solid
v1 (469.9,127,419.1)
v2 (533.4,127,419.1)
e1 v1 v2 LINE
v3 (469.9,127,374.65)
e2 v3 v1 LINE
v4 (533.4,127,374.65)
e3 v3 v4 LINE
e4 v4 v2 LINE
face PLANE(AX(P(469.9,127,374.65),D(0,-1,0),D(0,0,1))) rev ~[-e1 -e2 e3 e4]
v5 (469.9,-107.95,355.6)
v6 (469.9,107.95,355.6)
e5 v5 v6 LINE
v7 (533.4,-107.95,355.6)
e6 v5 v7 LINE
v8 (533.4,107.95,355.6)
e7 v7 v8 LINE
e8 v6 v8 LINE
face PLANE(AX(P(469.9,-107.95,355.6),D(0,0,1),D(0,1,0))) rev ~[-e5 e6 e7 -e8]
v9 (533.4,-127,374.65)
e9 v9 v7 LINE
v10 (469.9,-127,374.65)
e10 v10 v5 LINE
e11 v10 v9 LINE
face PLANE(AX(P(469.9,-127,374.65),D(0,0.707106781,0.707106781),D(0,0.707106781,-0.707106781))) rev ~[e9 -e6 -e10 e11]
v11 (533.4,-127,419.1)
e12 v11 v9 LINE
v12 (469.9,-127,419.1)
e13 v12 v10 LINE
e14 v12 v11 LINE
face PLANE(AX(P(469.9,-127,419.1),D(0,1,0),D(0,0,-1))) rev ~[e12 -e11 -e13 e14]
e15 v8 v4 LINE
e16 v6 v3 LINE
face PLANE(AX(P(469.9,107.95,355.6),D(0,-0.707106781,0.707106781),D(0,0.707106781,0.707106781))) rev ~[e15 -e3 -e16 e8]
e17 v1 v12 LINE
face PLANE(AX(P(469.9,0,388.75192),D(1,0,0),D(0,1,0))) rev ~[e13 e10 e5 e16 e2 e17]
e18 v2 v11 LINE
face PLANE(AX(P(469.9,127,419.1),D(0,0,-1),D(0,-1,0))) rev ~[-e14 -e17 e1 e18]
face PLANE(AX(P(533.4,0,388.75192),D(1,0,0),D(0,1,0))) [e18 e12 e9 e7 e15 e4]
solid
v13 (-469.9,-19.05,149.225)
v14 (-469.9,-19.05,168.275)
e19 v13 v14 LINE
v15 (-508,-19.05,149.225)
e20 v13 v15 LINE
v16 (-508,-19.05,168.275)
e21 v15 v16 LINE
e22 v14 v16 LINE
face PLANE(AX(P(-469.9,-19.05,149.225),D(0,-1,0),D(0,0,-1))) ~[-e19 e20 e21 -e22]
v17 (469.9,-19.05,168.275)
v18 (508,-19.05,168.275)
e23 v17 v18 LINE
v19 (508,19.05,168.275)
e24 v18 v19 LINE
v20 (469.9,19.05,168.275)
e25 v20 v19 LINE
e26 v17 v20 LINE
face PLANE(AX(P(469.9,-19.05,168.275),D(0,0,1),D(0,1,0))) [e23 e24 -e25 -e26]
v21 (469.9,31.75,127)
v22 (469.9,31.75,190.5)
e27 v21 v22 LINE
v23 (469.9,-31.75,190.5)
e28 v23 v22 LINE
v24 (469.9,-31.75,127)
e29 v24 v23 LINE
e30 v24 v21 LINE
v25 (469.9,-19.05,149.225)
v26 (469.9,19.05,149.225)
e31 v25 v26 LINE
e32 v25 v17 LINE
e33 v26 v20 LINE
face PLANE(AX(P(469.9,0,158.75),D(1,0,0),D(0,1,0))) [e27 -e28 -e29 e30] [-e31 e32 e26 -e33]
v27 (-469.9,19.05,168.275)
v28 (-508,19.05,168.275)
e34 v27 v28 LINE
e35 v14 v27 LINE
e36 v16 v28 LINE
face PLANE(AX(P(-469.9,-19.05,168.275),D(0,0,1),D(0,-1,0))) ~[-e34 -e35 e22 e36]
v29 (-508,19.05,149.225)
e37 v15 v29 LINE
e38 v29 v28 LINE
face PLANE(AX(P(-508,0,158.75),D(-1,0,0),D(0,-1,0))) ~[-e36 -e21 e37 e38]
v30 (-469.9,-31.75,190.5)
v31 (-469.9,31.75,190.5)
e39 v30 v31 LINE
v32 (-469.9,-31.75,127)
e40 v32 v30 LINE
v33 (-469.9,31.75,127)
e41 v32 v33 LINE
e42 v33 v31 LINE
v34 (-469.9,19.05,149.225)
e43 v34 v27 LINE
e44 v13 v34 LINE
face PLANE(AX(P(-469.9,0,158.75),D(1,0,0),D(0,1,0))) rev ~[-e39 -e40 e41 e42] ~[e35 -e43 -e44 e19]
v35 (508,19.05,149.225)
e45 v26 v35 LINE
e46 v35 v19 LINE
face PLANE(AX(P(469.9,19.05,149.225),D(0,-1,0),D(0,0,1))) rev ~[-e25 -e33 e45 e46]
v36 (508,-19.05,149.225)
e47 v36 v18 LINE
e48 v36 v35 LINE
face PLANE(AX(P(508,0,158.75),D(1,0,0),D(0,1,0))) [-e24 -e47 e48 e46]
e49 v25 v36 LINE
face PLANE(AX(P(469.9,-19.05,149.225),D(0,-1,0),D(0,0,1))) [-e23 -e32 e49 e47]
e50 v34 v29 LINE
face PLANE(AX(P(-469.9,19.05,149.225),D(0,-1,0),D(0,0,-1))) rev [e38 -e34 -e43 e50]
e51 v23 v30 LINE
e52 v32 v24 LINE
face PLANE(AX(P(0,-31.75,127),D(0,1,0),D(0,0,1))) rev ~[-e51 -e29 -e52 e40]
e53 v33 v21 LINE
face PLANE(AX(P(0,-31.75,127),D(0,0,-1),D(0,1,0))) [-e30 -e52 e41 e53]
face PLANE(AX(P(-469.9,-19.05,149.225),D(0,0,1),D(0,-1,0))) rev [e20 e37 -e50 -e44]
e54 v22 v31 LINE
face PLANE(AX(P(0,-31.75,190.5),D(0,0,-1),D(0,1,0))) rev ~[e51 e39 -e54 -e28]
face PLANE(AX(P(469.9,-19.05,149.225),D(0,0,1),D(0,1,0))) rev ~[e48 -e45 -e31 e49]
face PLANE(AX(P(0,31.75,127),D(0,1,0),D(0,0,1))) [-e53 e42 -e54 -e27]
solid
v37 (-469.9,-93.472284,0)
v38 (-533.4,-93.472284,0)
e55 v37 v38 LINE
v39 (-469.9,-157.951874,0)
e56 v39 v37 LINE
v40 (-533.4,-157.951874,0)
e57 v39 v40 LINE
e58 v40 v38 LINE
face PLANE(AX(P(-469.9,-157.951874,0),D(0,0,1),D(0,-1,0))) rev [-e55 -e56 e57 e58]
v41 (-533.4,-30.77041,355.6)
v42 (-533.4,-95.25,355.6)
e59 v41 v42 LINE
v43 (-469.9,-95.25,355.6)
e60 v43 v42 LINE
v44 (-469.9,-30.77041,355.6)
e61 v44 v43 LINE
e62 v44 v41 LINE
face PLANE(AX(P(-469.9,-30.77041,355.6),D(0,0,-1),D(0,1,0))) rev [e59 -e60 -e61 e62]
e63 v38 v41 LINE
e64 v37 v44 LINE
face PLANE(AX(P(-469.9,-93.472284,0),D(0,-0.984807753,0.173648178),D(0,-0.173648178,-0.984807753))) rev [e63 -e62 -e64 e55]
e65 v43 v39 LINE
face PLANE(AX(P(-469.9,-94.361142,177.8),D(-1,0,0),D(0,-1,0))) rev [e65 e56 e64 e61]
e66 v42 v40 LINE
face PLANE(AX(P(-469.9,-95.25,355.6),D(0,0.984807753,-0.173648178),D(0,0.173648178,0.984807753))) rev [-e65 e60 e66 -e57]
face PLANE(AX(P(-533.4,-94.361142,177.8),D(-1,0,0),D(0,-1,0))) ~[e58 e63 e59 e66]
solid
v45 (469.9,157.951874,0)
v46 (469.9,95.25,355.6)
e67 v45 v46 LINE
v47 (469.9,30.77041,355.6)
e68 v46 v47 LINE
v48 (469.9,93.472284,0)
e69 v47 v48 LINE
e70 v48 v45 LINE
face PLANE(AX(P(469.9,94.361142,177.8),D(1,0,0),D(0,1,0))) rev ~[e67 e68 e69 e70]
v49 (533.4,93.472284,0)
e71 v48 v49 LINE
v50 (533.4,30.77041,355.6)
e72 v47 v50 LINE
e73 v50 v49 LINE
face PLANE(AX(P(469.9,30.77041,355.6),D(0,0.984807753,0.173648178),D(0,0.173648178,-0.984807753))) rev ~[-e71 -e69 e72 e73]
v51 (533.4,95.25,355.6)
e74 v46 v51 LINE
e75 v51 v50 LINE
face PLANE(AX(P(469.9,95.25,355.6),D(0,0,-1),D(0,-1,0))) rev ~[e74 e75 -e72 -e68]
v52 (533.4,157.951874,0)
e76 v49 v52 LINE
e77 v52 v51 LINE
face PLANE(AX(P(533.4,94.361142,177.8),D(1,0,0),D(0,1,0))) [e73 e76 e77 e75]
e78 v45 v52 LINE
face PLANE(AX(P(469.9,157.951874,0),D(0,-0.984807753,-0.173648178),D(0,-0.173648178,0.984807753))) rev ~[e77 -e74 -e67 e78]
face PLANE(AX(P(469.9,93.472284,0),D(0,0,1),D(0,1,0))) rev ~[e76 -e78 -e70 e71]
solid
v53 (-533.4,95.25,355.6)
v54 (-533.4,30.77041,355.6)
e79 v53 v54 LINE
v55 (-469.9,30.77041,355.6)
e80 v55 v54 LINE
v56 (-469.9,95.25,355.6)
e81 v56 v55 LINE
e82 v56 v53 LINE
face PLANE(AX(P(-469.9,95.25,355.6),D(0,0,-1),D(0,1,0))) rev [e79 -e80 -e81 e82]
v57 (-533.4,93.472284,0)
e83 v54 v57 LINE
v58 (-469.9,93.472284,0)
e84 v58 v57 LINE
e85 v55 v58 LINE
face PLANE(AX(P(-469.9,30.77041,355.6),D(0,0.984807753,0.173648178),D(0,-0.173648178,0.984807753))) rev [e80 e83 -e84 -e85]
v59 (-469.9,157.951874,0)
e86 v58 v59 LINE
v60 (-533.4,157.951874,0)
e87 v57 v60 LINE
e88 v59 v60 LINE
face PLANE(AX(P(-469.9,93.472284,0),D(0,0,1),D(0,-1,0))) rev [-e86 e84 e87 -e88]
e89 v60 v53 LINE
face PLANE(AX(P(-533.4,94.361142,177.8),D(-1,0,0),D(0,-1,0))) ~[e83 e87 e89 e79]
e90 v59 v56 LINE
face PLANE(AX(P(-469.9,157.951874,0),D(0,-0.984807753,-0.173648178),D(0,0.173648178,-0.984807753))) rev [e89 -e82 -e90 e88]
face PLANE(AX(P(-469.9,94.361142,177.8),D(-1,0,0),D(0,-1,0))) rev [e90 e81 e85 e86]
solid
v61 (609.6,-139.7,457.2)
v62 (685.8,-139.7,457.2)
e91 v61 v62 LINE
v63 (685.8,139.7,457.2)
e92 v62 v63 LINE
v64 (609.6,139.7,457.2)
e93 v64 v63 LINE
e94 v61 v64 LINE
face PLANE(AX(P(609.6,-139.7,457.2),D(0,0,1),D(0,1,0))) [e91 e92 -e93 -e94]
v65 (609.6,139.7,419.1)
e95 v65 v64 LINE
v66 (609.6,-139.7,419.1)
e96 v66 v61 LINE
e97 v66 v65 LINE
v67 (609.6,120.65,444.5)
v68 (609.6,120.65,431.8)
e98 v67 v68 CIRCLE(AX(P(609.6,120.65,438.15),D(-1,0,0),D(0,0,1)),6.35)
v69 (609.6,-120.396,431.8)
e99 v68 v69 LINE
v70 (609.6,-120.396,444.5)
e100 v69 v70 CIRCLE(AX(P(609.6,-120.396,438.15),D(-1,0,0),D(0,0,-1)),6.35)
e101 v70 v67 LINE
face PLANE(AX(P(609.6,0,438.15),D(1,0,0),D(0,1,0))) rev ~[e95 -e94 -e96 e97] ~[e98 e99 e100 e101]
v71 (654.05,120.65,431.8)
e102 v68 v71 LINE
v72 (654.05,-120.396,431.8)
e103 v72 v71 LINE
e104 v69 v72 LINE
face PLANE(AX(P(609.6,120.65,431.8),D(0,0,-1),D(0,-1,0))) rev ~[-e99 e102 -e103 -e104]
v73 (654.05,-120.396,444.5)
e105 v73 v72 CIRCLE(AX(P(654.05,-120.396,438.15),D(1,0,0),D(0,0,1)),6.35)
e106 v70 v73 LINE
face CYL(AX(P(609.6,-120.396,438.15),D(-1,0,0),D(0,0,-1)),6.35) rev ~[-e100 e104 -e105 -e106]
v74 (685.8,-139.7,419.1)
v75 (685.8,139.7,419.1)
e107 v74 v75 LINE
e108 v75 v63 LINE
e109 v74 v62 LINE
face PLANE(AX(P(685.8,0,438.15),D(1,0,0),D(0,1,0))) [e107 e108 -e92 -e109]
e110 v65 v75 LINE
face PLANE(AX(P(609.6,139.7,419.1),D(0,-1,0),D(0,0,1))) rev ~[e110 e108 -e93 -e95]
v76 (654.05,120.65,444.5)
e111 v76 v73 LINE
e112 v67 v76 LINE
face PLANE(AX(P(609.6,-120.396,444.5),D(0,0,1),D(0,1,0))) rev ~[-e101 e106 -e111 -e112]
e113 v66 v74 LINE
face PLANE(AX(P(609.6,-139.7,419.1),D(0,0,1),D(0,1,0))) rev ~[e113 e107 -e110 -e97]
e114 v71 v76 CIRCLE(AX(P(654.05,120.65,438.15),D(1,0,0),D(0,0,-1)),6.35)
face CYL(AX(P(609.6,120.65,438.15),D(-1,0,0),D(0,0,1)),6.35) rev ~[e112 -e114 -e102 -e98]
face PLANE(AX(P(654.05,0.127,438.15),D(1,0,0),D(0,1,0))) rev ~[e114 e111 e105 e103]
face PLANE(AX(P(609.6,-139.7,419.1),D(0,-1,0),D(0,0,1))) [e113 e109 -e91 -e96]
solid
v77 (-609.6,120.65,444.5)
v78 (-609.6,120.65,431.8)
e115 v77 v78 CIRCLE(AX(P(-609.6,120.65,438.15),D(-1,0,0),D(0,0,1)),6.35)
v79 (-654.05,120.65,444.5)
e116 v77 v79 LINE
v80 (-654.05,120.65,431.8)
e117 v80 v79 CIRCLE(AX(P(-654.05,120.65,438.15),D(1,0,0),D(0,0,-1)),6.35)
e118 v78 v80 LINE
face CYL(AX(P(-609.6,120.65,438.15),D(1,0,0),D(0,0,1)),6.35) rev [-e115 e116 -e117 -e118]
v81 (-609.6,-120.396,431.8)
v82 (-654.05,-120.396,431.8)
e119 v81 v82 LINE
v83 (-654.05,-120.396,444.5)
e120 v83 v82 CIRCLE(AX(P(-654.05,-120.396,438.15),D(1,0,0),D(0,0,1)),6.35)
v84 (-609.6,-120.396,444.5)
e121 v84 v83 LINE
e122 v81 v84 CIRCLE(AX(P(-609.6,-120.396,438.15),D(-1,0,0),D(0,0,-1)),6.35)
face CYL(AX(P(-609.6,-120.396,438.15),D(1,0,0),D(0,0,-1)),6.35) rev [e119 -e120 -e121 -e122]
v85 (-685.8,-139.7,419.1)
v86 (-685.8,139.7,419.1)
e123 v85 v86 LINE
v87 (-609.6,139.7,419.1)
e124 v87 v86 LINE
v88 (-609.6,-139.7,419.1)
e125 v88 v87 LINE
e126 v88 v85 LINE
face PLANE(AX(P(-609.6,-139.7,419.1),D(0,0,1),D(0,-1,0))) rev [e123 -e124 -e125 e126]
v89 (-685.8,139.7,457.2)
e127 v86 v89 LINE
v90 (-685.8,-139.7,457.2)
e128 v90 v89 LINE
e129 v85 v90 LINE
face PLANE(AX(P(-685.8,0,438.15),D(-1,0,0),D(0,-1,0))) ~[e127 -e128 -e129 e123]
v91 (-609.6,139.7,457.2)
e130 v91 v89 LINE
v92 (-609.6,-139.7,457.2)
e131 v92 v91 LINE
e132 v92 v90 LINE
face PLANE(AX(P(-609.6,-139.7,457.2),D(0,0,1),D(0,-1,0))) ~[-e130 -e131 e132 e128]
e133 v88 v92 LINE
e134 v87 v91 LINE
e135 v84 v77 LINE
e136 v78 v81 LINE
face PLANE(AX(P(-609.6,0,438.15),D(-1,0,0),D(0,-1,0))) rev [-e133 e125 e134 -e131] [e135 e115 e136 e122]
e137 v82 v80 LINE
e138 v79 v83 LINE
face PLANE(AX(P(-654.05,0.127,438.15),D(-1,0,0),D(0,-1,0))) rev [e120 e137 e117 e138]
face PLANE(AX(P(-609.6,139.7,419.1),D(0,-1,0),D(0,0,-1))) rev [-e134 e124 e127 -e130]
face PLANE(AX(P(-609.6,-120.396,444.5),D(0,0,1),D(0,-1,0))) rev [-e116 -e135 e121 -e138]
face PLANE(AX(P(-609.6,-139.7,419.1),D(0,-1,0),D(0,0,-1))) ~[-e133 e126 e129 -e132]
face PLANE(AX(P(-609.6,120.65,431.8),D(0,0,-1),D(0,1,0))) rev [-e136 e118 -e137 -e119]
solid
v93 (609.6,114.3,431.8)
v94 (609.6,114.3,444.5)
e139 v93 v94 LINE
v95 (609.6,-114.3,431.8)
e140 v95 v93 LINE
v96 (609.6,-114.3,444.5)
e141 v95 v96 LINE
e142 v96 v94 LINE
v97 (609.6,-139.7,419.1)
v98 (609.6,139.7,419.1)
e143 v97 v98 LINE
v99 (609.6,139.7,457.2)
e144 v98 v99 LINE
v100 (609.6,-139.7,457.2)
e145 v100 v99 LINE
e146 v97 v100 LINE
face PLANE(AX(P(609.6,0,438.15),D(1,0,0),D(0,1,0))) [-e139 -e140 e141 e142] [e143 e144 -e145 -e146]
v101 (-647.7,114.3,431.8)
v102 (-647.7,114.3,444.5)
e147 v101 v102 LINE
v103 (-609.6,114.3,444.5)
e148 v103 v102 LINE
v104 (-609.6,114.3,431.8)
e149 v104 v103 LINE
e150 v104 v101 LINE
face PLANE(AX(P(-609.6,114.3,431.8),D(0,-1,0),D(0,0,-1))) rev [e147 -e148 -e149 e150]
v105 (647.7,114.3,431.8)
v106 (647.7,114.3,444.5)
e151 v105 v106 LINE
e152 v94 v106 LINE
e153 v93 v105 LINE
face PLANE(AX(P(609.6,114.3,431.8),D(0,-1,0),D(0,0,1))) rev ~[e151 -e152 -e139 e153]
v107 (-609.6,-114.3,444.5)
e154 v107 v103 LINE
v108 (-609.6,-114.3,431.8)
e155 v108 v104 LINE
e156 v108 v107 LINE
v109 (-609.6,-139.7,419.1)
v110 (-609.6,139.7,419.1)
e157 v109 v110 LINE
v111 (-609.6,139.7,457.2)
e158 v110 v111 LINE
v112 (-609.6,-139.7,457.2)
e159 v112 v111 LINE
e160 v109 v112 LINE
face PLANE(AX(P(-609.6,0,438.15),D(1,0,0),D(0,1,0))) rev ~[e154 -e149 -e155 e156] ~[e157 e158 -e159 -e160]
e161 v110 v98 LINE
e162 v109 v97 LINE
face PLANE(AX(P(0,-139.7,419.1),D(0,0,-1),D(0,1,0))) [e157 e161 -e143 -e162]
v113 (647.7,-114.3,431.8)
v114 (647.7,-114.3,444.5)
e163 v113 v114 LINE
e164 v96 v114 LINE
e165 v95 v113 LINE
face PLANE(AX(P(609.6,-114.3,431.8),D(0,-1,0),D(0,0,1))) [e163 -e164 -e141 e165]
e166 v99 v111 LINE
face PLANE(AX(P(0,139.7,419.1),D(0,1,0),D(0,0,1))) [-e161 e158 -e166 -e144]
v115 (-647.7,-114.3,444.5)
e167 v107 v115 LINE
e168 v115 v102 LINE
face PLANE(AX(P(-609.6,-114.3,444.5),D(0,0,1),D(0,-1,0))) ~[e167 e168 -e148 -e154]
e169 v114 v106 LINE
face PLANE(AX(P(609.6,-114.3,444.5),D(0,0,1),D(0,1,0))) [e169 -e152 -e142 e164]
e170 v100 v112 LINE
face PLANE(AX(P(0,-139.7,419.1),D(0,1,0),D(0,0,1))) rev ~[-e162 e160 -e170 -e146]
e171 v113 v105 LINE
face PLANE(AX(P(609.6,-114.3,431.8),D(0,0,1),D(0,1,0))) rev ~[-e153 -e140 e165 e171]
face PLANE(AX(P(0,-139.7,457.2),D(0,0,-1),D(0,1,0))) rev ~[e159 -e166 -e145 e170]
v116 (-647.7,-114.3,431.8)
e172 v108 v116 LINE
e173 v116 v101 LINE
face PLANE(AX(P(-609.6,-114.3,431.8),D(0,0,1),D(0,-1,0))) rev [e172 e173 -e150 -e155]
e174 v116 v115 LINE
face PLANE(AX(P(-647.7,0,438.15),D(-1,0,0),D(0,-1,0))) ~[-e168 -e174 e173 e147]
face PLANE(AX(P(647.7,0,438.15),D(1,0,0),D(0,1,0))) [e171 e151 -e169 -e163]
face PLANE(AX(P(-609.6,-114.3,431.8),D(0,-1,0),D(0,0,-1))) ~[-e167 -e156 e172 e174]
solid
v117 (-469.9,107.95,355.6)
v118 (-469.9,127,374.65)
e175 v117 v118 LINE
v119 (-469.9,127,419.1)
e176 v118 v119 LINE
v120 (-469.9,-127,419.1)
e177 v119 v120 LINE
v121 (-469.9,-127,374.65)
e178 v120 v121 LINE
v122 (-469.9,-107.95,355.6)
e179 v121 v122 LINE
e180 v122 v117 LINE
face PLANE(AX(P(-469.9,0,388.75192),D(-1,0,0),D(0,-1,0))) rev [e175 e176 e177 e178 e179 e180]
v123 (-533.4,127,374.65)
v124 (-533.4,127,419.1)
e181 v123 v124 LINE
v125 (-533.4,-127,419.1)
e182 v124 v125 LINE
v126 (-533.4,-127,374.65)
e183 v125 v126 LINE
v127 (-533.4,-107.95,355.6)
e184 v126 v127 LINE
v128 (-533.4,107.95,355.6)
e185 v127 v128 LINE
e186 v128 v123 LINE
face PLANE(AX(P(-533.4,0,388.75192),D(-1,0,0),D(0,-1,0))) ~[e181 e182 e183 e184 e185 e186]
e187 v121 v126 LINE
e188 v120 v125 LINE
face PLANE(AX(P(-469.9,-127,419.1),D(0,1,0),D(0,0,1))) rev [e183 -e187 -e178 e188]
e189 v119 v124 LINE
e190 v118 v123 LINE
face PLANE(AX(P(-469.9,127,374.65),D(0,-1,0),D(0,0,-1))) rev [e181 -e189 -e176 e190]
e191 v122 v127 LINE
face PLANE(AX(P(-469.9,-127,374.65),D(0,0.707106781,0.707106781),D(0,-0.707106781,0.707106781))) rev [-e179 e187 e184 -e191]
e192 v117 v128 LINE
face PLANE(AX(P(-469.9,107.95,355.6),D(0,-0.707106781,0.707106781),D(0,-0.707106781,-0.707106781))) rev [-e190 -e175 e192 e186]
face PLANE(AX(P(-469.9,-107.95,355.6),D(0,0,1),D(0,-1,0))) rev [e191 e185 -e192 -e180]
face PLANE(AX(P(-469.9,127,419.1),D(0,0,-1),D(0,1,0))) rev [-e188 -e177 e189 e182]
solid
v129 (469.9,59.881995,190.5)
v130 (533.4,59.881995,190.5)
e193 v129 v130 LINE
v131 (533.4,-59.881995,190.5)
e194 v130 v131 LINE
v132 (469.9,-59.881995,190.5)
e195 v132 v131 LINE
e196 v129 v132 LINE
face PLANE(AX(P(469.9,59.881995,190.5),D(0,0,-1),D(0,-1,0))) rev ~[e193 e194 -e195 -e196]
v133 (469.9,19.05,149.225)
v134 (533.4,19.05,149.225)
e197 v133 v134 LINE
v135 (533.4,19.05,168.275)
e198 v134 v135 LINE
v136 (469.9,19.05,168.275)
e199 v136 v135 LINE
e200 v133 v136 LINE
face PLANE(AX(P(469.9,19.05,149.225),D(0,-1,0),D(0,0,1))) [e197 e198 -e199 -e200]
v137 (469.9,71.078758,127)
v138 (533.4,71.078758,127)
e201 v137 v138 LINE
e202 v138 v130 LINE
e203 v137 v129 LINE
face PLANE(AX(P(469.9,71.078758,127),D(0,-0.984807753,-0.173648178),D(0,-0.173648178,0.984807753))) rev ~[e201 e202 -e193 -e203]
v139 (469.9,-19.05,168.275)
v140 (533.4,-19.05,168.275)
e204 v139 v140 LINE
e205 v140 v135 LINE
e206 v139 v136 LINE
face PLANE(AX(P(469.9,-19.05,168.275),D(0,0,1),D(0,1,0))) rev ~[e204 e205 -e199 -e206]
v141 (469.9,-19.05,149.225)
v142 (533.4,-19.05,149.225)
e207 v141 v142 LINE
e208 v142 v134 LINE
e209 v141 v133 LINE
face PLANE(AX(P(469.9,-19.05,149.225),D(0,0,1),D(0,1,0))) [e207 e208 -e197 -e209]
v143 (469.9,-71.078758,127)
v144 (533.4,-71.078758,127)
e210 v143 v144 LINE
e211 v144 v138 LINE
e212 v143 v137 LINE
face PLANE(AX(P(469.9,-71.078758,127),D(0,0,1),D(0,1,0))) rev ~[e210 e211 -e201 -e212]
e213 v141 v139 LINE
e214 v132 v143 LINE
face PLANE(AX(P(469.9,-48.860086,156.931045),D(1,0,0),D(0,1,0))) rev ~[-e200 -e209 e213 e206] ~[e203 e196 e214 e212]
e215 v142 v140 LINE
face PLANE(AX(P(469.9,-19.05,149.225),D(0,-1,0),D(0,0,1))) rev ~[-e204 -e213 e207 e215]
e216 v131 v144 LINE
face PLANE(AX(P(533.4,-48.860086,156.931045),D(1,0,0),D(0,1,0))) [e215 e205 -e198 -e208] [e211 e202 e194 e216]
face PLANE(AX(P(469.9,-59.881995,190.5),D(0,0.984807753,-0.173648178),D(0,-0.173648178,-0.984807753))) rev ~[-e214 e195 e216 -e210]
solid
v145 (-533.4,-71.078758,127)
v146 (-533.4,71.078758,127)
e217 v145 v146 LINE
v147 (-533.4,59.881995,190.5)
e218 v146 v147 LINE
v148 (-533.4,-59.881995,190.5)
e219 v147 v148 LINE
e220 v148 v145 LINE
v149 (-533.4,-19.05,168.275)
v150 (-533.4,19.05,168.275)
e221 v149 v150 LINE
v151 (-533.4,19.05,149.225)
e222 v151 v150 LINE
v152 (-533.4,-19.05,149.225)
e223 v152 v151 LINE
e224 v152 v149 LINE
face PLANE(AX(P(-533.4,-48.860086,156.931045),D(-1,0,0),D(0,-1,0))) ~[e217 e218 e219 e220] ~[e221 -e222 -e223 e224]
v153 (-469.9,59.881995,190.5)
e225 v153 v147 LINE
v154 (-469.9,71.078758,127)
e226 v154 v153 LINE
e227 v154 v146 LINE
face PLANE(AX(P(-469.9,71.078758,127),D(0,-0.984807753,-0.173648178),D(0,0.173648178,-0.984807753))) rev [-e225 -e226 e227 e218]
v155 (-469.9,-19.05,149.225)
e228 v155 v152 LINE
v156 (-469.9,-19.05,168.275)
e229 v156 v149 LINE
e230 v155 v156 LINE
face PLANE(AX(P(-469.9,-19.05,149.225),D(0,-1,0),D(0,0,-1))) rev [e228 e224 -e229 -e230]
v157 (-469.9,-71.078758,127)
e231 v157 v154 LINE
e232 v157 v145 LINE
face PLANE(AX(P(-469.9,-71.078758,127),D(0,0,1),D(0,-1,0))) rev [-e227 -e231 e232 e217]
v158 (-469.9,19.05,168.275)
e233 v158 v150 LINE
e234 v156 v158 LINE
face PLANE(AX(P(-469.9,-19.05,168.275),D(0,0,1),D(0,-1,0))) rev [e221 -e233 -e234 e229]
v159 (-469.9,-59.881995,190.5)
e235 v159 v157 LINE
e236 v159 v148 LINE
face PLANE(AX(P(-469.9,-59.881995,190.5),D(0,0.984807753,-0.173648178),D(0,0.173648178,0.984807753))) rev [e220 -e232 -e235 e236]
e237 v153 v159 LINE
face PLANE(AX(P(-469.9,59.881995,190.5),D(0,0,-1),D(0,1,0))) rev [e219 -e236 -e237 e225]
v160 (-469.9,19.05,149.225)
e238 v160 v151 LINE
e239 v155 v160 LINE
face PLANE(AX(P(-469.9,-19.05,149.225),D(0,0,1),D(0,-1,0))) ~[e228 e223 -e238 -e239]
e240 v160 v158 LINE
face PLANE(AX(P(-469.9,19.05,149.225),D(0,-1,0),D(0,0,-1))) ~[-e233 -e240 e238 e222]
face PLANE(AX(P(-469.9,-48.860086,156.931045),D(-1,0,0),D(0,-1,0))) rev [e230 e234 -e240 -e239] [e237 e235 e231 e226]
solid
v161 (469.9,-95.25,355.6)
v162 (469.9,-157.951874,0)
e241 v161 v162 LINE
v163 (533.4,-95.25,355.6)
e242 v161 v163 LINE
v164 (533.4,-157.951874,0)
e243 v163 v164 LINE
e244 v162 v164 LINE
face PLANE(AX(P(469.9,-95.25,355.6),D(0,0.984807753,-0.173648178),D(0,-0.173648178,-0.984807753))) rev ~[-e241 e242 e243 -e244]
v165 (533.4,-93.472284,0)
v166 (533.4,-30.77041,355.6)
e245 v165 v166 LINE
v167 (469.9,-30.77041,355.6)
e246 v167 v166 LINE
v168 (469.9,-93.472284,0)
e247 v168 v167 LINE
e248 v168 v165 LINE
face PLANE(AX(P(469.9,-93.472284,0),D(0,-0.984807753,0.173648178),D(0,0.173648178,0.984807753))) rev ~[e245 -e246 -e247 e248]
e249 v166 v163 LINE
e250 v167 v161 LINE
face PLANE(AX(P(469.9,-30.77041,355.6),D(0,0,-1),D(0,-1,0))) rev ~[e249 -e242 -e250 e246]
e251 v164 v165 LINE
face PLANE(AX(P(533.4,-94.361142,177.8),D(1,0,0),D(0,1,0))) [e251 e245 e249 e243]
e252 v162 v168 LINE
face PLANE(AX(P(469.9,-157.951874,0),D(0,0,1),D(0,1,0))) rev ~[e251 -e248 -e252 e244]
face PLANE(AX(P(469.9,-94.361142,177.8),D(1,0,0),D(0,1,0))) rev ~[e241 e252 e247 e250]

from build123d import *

# Parameters (mm, degrees)
F0_W      = 279.4
F0_H      = 38.1
F1_DEPTH  = 609.6
F2_W      = 228.6
F2_H      = 12.7
F3_DEPTH  = 38.1
F4_W      = 279.4
F4_H      = 38.1
F5_DEPTH  = 76.2
F7_START  = 6.35
F7_DEPTH  = 31.75
F9_W      = 63.5
F9_H      = 63.5
F10_DEPTH = 469.9
F11_W     = 38.1
F11_H     = 19.05
F12_DEPTH = 38.1
F15_DEPTH = 63.5
F16_DEPTH = 63.5
F17_DEPTH = 63.5
F14_W     = 63.5
F14_H     = 63.5
F14_W_2   = 38.1
F14_H_2   = 19.05
F18_DEPTH = 63.5


# Not quite as in the source:
# - a pattern or mirror of a feature is missing from the dataset's text; its kind, count and spacing are read off the source's solid


with BuildPart() as f1:
    # F0 (on Right) → F1 (new body, symmetric)
    with BuildSketch(Plane.YZ):
        with Locations((0, 438.15)):
            Rectangle(F0_W, F0_H)
    extrude(amount=F1_DEPTH, both=True)

    # F2 (on face) → F3 (join)
    with BuildSketch(Plane.YZ.offset(609.6)):
        with Locations((0, 438.15)):
            Rectangle(F2_W, F2_H)
    f3 = extrude(amount=F3_DEPTH)

    # F3_copies: F3 across plane
    add(f3.mirror(Plane(origin=(0, 0, 0), x_dir=(0, 0, -1), z_dir=(-1, 0, 0))))


with BuildPart() as f5:
    # F4 (on face) → F5 (new body)
    with BuildSketch(Plane.YZ.offset(609.6)):
        with Locations((0, 438.15)):
            Rectangle(F4_W, F4_H)
        with BuildLine():
            ThreePointArc((-120.396, 431.8), (-126.746, 438.15), (-120.396, 444.5))
            Line((-120.396, 444.5), (120.65, 444.5))
            ThreePointArc((120.65, 444.5), (127, 438.15), (120.65, 431.8))
            Line((120.65, 431.8), (-120.396, 431.8))
        make_face(mode=Mode.SUBTRACT)
    extrude(amount=F5_DEPTH)

    # F6 (on face) → F7 (join)
    with BuildSketch(Plane.YZ.offset(647.7).offset(F7_START)):
        with BuildLine():
            ThreePointArc((-120.396, 444.5), (-126.746, 438.15), (-120.396, 431.8))
            Line((-120.396, 431.8), (120.65, 431.8))
            ThreePointArc((120.65, 431.8), (127, 438.15), (120.65, 444.5))
            Line((120.65, 444.5), (-120.396, 444.5))
        make_face()
    extrude(amount=F7_DEPTH)


with BuildPart() as f8_1:
    # F8: instance of F5
    add(f5.part.mirror(Plane.YZ))


with BuildPart() as f10:
    # F9 (on Right) → F10 (new body, symmetric)
    with BuildSketch(Plane.YZ):
        with Locations((0, 158.75)):
            Rectangle(F9_W, F9_H)
    extrude(amount=F10_DEPTH, both=True)

    # F11 (on face) → F12 (join)
    with BuildSketch(Plane.YZ.offset(469.9)):
        with Locations((0, 158.75)):
            Rectangle(F11_W, F11_H)
    extrude(amount=F12_DEPTH)

    # F13: F10 across plane


with BuildPart() as f10_1:
    add(f10.part)
    add(f10.part.mirror(Plane.YZ))


with BuildPart() as f15:
    # F14 (on face) → F15 (new body)
    with BuildSketch(Plane.YZ.offset(469.9)):
        Polygon((-107.95, 355.6), (-95.25, 355.6), (-30.7704101453, 355.6), (30.7704101453, 355.6), (95.25, 355.6), (107.95, 355.6), (127, 374.65), (127, 419.1), (-127, 419.1), (-127, 374.65), align=None)
    extrude(amount=F15_DEPTH)


with BuildPart() as f16:
    # F14 (on face) → F16 (new body, through all)
    with BuildSketch(Plane.YZ.offset(469.9)):
        Polygon((-95.25, 355.6), (-157.9518743399, 0), (-93.4722844852, 0), (-71.0787579352, 127), (-59.8819946602, 190.5), (-30.7704101453, 355.6), align=None)
    extrude(amount=F16_DEPTH)


with BuildPart() as f17:
    # F14 (on face) → F17 (new body, through all)
    with BuildSketch(Plane.YZ.offset(469.9)):
        Polygon((95.25, 355.6), (30.7704101453, 355.6), (59.8819946602, 190.5), (71.0787579352, 127), (93.4722844852, 0), (157.9518743399, 0), align=None)
    extrude(amount=F17_DEPTH)


with BuildPart() as f18:
    # F14 (on face) → F18 (new body, through all)
    with BuildSketch(Plane.YZ.offset(469.9)):
        Polygon((-59.8819946602, 190.5), (-71.0787579352, 127), (-31.75, 127), (-31.75, 190.5), align=None)
        with Locations((0, 158.75)):
            Rectangle(F14_W, F14_H)
        with Locations((0, 158.75)):
            Rectangle(F14_W_2, F14_H_2, mode=Mode.SUBTRACT)
        Polygon((31.75, 190.5), (31.75, 127), (71.0787579352, 127), (59.8819946602, 190.5), align=None)
    extrude(amount=F18_DEPTH)


with BuildPart() as f19_1:
    # F19: instance of F16
    add(f16.part.mirror(Plane.YZ))


with BuildPart() as f19_2:
    # F19: instance of F15
    add(f15.part.mirror(Plane.YZ))


with BuildPart() as f19_3:
    # F19: instance of F17
    add(f17.part.mirror(Plane.YZ))


with BuildPart() as f19_4:
    # F19: instance of F18
    add(f18.part.mirror(Plane.YZ))


solid = Compound([f1.part, f5.part, f8_1.part, f10_1.part, f15.part, f16.part, f17.part, f18.part, f19_1.part, f19_2.part, f19_3.part, f19_4.part])
